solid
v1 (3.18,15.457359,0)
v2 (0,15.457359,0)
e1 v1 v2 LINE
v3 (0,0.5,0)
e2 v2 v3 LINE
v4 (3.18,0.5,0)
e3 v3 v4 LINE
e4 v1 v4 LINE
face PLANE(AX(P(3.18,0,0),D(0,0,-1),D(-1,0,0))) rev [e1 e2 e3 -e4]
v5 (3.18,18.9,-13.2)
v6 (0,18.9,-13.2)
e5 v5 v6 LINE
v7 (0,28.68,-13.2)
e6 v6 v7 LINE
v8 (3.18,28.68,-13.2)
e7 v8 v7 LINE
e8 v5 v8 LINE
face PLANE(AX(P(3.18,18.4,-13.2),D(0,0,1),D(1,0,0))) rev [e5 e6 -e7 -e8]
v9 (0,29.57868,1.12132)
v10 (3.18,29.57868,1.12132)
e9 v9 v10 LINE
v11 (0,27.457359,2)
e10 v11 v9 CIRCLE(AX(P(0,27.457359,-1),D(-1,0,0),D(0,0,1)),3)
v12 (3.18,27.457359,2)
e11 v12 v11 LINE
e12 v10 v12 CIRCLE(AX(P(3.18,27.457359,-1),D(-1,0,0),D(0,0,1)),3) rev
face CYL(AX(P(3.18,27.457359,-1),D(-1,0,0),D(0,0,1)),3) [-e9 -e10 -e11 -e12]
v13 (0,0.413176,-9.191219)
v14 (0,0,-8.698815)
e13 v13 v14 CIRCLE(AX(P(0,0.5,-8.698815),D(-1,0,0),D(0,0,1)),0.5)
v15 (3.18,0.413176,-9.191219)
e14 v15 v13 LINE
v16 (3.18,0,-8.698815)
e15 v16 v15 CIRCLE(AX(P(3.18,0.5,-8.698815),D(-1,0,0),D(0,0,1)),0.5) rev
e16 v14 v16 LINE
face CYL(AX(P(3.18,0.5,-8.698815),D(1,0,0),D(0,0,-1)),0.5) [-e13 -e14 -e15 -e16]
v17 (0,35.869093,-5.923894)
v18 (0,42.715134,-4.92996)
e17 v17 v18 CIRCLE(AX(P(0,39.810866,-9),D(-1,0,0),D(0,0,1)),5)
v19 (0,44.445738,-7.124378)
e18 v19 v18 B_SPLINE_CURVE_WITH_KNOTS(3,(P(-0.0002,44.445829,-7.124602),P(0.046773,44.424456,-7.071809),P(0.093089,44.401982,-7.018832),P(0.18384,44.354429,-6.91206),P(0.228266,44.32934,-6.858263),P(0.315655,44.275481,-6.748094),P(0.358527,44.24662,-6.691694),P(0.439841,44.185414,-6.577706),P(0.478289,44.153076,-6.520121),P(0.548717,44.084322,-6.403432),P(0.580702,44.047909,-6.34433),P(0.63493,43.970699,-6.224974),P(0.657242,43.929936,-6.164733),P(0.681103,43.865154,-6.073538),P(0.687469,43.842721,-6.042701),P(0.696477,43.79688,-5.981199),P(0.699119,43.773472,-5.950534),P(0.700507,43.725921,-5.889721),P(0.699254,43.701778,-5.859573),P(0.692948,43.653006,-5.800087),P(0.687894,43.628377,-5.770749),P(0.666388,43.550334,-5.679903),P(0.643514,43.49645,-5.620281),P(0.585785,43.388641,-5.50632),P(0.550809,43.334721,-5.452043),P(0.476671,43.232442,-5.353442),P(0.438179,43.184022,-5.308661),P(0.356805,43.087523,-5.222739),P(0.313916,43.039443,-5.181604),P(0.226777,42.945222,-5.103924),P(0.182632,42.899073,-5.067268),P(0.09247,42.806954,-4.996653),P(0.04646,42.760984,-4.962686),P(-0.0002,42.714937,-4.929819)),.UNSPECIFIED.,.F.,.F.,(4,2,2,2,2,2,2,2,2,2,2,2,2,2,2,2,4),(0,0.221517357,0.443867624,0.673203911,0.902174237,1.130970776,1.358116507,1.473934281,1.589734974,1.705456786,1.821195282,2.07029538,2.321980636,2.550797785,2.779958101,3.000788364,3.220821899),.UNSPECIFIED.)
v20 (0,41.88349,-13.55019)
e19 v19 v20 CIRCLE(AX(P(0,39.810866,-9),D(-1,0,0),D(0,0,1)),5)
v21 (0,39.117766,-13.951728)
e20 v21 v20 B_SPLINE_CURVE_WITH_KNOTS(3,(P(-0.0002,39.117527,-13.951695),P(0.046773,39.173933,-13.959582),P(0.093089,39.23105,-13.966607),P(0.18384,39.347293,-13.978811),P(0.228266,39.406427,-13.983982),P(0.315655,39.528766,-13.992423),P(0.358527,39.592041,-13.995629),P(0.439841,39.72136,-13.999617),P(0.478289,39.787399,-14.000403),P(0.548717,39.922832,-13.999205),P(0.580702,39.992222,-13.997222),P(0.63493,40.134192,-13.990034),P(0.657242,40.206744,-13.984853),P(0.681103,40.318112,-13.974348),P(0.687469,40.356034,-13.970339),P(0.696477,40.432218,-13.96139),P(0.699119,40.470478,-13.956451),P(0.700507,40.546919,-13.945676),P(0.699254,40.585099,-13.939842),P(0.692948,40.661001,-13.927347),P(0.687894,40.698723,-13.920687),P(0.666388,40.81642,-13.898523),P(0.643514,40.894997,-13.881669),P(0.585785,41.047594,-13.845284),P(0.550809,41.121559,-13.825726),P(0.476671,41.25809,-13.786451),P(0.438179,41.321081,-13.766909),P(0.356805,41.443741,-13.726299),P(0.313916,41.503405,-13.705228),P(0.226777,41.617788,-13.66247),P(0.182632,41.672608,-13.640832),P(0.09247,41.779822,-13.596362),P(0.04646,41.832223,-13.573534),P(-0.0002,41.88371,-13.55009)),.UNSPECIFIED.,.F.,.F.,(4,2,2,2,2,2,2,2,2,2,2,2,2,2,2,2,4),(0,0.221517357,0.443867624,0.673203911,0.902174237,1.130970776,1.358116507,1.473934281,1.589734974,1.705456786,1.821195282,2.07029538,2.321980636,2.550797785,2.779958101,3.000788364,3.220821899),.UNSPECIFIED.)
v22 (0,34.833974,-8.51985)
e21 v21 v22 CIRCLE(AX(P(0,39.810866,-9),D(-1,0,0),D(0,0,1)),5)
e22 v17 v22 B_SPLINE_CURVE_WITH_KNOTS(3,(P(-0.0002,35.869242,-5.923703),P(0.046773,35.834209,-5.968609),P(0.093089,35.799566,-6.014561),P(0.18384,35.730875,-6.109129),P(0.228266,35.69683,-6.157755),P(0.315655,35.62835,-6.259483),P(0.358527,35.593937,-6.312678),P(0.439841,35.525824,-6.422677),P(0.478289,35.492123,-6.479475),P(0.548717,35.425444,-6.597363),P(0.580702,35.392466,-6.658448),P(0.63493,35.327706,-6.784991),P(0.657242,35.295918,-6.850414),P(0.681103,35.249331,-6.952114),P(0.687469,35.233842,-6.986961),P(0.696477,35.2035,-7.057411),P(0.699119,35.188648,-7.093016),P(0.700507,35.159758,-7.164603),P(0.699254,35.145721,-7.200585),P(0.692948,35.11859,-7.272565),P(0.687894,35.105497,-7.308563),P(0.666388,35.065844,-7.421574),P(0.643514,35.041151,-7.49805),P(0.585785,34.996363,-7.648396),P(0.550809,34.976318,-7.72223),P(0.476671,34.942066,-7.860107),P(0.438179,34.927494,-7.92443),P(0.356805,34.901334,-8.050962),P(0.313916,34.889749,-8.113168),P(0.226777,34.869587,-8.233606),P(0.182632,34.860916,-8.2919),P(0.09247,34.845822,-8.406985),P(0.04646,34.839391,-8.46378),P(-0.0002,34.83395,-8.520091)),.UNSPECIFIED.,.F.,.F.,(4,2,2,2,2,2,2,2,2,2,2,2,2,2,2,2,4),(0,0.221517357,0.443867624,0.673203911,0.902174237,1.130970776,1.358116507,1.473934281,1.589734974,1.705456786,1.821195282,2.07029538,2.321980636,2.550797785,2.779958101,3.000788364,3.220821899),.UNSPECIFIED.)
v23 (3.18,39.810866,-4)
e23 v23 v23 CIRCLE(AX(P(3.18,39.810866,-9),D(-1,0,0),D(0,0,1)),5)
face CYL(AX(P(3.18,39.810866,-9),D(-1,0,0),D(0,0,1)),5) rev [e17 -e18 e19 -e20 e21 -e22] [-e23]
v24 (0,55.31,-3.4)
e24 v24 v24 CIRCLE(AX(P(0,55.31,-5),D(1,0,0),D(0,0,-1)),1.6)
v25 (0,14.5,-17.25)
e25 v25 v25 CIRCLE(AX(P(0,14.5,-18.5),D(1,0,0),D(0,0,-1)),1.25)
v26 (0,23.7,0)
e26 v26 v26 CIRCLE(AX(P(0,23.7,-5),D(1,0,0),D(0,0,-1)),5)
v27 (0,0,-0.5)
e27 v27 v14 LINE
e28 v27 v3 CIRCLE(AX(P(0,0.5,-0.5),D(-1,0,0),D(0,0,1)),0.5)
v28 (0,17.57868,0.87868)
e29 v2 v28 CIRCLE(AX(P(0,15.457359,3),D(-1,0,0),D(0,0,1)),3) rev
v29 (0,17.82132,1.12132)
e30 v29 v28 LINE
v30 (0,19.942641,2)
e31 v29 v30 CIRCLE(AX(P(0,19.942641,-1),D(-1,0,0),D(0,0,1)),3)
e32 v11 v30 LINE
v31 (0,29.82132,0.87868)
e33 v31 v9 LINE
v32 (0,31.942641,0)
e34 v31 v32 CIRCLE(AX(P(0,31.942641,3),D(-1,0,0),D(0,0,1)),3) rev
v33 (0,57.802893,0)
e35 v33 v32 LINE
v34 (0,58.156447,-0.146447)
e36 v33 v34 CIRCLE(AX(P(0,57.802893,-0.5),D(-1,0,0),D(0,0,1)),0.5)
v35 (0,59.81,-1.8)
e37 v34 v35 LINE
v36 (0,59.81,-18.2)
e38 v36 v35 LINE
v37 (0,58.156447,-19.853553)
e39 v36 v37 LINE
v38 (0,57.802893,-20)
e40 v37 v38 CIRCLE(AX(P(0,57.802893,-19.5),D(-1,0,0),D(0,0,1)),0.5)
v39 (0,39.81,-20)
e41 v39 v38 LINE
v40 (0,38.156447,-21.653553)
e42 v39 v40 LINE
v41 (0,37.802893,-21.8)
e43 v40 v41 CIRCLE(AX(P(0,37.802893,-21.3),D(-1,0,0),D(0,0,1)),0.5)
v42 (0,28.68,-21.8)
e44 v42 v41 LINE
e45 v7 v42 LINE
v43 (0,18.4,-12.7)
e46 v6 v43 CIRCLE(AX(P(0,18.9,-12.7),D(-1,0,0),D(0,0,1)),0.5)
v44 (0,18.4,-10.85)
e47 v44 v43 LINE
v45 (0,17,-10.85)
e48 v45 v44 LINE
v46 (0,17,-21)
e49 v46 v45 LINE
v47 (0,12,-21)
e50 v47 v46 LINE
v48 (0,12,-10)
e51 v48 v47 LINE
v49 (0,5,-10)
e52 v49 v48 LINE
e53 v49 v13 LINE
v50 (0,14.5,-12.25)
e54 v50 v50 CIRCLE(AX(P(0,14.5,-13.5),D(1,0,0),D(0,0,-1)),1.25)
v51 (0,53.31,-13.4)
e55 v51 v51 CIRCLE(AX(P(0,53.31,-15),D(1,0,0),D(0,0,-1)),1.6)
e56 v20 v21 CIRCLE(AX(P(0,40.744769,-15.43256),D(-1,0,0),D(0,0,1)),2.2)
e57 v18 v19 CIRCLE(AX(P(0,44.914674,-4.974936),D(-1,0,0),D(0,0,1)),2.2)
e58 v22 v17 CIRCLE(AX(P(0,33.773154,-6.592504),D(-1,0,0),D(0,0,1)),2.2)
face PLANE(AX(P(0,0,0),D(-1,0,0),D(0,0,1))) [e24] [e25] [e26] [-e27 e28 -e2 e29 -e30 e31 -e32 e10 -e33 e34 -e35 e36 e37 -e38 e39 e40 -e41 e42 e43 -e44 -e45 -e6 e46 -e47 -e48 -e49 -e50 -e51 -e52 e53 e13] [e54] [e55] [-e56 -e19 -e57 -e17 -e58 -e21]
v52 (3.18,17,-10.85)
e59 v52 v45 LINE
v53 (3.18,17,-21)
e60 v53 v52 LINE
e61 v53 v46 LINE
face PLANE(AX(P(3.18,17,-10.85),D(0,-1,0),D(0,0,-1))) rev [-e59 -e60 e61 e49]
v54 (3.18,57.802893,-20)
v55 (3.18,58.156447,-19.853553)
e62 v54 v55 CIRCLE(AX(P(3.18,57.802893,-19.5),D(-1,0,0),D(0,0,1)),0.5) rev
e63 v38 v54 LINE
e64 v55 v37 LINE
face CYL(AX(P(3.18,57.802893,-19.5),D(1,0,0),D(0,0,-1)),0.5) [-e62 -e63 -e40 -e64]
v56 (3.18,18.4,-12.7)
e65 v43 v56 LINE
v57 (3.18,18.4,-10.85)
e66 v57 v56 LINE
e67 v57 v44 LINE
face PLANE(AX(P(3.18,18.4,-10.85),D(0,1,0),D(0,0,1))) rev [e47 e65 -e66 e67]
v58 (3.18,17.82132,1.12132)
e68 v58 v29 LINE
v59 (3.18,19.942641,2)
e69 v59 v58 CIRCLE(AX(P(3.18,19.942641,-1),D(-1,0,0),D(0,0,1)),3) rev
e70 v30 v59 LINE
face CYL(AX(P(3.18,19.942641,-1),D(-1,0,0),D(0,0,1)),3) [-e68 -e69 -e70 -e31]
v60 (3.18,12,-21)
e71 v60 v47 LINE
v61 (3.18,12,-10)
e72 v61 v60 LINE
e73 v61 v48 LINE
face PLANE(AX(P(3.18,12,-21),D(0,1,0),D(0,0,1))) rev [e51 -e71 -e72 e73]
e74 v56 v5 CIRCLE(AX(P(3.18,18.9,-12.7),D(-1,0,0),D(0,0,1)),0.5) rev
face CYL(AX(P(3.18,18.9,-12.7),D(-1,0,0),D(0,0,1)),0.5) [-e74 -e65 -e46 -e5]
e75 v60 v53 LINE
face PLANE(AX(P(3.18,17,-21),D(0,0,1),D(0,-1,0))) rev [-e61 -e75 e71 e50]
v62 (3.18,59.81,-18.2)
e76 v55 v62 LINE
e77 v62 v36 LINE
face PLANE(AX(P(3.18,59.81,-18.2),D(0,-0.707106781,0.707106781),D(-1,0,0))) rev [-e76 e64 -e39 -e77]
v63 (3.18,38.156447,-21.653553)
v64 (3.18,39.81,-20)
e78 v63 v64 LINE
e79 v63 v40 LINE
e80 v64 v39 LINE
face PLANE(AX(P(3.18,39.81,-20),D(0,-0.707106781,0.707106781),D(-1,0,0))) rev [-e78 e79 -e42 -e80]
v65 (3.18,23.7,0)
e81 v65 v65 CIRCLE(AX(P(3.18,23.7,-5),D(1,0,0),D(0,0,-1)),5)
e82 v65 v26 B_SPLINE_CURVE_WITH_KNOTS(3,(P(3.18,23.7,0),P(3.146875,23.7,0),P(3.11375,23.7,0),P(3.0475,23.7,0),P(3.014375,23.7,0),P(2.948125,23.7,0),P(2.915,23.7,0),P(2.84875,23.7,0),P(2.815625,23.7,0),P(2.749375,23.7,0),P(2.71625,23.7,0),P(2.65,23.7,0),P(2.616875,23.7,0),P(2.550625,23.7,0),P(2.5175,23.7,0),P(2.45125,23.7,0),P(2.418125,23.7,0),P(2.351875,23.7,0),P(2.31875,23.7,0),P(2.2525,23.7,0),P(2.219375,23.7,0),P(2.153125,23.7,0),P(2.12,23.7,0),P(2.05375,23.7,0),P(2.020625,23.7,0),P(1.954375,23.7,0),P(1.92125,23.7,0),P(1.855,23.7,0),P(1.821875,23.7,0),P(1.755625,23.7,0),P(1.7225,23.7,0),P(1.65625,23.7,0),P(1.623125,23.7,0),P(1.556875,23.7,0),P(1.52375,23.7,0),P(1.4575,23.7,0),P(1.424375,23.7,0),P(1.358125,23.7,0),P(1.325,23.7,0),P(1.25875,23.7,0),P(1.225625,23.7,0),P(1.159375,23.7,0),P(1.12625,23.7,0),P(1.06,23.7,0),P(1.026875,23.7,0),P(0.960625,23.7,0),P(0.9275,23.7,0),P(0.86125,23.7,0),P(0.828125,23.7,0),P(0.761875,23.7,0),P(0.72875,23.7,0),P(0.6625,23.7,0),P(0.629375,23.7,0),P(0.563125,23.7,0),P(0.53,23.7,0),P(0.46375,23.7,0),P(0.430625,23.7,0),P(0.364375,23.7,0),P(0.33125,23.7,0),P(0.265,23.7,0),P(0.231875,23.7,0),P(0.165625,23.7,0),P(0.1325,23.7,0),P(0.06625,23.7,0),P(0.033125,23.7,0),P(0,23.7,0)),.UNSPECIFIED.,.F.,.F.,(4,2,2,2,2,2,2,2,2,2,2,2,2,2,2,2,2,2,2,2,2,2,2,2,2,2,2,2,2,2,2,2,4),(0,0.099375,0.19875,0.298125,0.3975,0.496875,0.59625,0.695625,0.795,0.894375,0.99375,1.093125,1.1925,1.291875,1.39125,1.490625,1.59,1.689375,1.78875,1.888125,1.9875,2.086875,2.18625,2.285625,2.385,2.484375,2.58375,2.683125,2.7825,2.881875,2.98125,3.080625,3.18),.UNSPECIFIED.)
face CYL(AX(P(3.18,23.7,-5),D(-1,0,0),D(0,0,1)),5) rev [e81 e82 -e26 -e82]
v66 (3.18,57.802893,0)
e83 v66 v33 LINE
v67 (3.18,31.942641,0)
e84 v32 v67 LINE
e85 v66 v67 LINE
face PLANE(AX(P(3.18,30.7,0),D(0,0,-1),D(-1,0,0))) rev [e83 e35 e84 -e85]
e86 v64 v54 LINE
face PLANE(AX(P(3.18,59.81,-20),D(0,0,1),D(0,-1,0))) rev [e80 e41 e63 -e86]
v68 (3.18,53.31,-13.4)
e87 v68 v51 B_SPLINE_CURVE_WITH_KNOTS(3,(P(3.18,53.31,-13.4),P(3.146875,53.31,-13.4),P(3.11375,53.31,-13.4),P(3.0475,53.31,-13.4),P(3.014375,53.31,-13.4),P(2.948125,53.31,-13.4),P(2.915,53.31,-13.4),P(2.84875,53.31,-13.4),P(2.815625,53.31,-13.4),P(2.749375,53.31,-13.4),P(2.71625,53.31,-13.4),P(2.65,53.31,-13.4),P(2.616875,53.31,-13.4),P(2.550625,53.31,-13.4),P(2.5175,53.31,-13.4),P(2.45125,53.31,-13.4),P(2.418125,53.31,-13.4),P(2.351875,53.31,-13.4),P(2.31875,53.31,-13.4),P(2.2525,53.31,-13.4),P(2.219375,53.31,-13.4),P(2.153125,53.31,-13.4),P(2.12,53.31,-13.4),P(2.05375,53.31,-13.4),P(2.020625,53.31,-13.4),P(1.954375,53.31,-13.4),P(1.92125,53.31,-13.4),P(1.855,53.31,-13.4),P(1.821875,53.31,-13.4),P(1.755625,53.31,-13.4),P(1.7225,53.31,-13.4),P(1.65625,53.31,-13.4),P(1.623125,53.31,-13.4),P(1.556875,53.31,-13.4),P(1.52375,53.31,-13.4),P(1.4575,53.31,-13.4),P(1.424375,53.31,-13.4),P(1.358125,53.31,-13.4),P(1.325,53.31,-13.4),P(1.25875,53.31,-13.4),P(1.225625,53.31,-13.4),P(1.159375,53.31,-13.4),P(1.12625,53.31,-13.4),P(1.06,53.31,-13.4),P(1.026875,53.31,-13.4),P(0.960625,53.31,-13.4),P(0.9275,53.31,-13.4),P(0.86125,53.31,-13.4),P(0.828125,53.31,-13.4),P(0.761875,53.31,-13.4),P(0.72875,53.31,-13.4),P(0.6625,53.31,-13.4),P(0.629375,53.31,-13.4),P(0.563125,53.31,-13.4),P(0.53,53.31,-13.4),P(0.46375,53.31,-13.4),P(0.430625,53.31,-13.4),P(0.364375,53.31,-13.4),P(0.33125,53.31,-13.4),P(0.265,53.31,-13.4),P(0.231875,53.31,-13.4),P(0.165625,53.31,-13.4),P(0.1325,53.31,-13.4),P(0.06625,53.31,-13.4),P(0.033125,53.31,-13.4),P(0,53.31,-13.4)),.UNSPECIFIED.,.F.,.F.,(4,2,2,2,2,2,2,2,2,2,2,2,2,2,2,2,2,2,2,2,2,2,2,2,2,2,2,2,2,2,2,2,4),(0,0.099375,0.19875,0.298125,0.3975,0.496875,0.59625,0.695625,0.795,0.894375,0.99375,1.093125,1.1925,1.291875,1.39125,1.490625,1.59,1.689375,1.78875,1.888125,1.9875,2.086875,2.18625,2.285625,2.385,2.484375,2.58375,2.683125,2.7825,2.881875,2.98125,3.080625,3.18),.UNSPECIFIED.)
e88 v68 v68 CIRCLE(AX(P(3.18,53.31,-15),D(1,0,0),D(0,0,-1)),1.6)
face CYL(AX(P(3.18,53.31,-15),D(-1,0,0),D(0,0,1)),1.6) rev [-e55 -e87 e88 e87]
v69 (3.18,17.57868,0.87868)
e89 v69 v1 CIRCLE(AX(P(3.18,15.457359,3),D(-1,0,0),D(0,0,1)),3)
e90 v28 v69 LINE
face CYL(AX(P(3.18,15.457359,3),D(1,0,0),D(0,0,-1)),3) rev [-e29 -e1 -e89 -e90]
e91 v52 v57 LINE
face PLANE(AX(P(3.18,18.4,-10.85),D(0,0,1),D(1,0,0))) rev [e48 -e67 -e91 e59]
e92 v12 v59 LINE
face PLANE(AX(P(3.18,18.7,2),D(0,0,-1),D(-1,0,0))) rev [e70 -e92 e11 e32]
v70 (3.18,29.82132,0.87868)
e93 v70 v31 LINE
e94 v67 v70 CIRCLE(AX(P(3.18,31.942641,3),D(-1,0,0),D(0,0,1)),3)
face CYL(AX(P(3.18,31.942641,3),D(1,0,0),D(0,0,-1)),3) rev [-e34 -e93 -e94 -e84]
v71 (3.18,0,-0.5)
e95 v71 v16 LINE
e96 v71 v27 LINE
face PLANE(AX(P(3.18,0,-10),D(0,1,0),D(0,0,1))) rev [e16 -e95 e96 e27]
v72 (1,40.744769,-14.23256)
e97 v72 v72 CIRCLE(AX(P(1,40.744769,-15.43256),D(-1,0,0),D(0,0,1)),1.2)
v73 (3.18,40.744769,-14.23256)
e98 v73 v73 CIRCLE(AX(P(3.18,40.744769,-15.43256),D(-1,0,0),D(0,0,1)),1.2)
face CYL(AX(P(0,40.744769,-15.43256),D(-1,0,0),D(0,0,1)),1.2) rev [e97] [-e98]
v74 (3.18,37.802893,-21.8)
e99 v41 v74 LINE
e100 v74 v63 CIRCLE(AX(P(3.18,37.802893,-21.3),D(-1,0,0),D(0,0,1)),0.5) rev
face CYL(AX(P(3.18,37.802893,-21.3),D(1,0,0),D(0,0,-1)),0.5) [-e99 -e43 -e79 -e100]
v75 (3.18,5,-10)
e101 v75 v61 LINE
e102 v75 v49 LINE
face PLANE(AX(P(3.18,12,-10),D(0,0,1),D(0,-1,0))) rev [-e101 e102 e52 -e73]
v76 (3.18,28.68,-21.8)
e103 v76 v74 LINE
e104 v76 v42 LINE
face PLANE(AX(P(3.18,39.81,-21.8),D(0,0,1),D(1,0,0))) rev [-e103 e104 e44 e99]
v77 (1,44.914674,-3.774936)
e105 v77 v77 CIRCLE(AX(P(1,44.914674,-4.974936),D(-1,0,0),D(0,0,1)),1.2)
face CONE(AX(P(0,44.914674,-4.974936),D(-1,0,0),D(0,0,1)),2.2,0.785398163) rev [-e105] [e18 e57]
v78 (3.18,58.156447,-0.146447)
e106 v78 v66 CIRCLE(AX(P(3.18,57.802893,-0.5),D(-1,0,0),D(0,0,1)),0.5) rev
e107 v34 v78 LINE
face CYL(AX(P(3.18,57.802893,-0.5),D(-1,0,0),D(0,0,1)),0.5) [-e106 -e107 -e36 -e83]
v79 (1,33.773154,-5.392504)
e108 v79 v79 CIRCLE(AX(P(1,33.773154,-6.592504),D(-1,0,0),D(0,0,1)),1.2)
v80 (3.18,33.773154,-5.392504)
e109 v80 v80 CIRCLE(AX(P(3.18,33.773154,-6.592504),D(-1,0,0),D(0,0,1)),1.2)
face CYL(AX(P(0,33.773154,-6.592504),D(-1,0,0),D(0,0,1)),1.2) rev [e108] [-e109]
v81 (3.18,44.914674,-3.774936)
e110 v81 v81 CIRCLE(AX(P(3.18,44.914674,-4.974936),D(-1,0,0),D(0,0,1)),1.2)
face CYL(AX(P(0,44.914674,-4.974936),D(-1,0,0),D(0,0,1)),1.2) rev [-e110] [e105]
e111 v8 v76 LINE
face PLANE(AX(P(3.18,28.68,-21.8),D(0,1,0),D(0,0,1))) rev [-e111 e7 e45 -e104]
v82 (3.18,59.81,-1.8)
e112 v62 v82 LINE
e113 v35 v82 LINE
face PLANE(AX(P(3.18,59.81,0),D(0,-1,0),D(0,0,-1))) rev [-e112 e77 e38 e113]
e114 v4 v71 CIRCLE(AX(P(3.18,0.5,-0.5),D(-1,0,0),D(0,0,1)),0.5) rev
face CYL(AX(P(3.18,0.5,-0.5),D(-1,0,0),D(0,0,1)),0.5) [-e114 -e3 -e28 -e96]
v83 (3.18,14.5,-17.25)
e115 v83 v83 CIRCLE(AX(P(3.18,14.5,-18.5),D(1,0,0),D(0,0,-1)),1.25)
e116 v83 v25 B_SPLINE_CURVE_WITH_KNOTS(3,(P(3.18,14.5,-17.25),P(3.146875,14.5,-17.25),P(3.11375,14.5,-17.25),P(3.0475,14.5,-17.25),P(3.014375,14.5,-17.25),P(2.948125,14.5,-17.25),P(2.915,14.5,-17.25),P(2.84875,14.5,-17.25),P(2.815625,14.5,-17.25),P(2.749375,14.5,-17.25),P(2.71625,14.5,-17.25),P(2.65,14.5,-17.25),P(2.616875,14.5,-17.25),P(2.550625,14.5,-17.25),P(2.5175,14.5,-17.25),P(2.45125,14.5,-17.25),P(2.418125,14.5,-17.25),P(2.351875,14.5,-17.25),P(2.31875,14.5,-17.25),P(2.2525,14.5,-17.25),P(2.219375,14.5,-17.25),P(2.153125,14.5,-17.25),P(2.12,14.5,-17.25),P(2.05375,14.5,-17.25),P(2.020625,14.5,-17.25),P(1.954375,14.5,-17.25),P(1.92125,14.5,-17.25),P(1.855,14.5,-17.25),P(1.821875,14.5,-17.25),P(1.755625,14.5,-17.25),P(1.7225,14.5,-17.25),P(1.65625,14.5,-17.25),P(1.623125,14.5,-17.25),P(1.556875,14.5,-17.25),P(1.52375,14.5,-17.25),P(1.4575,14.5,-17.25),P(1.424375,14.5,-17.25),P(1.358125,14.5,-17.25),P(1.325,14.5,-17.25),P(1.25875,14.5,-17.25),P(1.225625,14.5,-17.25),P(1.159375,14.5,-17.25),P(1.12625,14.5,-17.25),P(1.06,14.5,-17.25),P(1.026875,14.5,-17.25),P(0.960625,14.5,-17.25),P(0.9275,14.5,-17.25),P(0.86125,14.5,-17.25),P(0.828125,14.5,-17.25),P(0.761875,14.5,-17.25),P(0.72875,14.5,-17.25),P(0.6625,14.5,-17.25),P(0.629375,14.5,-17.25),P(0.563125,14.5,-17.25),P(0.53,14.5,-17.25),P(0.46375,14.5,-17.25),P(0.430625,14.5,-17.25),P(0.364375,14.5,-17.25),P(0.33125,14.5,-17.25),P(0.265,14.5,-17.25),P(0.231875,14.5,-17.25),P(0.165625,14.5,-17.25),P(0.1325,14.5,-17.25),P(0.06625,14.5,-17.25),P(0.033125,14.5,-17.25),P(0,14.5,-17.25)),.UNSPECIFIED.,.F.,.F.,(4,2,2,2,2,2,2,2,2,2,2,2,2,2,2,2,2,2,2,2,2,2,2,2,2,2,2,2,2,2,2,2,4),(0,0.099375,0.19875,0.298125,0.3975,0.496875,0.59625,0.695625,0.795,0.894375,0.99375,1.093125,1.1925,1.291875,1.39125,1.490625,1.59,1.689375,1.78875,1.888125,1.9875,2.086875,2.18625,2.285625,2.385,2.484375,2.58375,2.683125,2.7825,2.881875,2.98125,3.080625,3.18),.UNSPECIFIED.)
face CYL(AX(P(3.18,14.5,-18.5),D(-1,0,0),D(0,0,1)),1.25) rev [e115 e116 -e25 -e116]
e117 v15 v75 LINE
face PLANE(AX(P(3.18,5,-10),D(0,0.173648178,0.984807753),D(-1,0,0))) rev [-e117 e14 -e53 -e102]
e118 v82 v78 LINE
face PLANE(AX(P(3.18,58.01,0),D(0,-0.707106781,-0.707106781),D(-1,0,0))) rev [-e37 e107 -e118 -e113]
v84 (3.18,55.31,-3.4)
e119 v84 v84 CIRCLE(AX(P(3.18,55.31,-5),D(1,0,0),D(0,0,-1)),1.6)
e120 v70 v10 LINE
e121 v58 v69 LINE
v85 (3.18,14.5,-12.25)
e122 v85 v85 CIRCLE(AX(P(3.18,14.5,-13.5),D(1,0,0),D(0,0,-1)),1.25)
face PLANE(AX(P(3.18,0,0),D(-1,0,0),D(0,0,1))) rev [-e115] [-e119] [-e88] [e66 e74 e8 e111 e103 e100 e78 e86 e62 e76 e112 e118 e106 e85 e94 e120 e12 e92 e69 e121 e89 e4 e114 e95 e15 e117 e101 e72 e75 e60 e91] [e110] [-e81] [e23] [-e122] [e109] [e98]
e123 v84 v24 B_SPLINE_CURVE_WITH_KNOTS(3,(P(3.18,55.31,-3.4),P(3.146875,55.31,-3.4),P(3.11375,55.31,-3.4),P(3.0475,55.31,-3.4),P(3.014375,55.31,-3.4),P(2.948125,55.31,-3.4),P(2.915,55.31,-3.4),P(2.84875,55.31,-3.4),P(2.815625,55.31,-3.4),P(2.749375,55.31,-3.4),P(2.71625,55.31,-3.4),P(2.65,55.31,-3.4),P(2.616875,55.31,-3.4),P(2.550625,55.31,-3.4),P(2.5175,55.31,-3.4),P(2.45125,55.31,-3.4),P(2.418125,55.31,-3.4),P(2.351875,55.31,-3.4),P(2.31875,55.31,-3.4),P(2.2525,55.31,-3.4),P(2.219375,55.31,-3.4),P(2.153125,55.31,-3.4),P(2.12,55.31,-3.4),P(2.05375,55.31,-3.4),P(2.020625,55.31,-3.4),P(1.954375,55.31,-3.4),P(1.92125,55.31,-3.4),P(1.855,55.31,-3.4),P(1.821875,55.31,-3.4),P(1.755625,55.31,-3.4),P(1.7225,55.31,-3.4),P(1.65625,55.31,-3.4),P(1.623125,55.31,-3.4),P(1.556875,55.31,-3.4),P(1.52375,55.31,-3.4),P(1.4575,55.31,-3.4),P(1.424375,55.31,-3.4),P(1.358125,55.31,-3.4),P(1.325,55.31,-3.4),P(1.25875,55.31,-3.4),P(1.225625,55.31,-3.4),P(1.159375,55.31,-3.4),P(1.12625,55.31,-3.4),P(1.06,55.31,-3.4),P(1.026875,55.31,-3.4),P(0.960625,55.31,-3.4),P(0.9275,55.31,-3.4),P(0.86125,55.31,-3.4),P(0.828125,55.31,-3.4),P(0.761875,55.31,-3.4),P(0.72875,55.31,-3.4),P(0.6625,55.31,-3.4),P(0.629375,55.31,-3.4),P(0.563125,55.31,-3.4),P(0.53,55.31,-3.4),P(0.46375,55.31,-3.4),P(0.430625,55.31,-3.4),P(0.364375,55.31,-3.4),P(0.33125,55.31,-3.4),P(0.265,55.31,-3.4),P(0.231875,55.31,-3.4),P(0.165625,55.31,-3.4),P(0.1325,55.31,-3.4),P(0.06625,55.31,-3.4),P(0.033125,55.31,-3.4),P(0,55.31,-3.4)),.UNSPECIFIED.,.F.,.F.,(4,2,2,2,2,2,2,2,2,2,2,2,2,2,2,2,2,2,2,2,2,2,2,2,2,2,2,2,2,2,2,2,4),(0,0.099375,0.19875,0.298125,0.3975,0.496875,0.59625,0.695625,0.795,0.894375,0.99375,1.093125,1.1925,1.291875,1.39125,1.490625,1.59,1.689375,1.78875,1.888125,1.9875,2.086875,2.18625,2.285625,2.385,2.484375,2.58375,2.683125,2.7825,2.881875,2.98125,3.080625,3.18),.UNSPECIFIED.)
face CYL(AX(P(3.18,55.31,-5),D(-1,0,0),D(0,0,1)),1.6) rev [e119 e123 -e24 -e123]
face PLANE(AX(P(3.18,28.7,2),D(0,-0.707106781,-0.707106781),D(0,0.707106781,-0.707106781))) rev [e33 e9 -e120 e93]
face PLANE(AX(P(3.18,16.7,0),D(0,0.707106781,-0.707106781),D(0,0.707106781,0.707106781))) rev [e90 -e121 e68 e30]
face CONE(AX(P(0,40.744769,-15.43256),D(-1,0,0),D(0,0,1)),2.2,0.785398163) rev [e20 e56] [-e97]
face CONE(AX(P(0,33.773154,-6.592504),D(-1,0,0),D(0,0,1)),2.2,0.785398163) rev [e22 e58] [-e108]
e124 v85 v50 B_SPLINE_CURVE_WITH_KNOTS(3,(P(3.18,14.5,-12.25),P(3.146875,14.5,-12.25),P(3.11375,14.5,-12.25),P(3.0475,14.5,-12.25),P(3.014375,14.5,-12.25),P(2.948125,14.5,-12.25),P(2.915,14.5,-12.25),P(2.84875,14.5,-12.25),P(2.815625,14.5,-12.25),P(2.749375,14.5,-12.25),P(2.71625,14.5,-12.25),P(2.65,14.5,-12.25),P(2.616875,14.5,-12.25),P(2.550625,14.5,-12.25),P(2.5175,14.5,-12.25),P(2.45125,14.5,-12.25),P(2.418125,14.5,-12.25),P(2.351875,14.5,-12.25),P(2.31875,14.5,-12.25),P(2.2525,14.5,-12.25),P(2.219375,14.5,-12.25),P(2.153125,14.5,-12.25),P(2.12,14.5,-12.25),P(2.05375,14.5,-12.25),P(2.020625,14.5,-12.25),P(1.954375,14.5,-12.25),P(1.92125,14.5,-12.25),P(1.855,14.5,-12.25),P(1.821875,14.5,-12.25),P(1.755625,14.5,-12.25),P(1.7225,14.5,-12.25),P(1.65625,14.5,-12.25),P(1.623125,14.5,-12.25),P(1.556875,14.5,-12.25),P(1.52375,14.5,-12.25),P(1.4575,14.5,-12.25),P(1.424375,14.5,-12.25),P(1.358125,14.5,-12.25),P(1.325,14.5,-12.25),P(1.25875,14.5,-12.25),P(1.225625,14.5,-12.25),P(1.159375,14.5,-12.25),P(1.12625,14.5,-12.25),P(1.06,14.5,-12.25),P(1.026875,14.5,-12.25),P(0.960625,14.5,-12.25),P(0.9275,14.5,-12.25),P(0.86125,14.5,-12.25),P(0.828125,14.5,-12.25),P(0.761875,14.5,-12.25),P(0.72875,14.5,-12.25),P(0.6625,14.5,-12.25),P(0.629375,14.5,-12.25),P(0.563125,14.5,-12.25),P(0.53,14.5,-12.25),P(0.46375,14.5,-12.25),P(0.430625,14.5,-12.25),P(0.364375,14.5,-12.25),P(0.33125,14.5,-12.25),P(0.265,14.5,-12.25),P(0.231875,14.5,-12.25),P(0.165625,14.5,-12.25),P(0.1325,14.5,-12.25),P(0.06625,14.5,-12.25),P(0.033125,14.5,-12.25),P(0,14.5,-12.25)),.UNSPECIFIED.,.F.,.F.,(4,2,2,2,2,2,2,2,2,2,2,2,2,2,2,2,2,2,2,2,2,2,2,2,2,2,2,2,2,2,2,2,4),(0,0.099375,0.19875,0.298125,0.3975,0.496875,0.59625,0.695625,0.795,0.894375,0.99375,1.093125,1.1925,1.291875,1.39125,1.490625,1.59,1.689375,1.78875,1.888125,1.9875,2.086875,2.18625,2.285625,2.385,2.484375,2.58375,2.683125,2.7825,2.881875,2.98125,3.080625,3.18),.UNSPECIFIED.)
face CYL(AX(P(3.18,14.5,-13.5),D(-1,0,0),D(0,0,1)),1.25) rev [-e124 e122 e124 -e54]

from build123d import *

# Parameters (mm, degrees)
SKETCH1_R                                       = 5
SKETCH1_R_2                                     = 1.6
SKETCH1_R_3                                     = 1.25
BOSS_EXTRUDE1_DEPTH                             = 3.18
CHAMFER1_SIZE                                   = 5
CHAMFER1_SIZE2                                  = 0.881634904
CSK_FOR_M2_FLAT_HEAD_MACHINE_SCREW1_D           = 2.4
CSK_FOR_M2_FLAT_HEAD_MACHINE_SCREW1_DEPTH       = 3.508967257
CSK_FOR_M2_FLAT_HEAD_MACHINE_SCREW1_CSINK_D     = 4.4
CSK_FOR_M2_FLAT_HEAD_MACHINE_SCREW1_CSINK_ANGLE = 90
CSK_FOR_M2_FLAT_HEAD_MACHINE_SCREW1_TIP         = 0.721032743
SKETCH3_R                                       = 5
CUT_EXTRUDE4_DEPTH                              = 64.738438167
FILLET2_R                                       = 3
CHAMFER2_SIZE                                   = 1.8
FILLET4_R                                       = 0.5


with BuildPart() as part:
    # Sketch1 → Boss-Extrude1 (new body)
    with BuildSketch(Plane(origin=(0, 0, 0), x_dir=(0, 0, -1), z_dir=(1, 0, 0))):
        Polygon((0, 0), (0, 16.7), (-2, 18.7), (-2, 28.7), (0, 30.7), (0, 59.81), (20, 59.81), (20, 39.81), (21.8, 39.81), (21.8, 28.68), (13.2, 28.68), (13.2, 18.4), (10.85, 18.4), (10.85, 17), (21, 17), (21, 12), (10, 12), (10, 0), align=None)
        with Locations(Location((5, 23.7, 0), (0, 0, 180))):
            Circle(SKETCH1_R, mode=Mode.SUBTRACT)
        with Locations(Location((5, 55.31, 0), (0, 0, 180))):
            Circle(SKETCH1_R_2, mode=Mode.SUBTRACT)
        with Locations(Location((15, 53.31, 0), (0, 0, 180))):
            Circle(SKETCH1_R_2, mode=Mode.SUBTRACT)
        with Locations(Location((18.5, 14.5, 0), (0, 0, 180))):
            Circle(SKETCH1_R_3, mode=Mode.SUBTRACT)
        with Locations(Location((13.5, 14.5, 0), (0, 0, 180))):
            Circle(SKETCH1_R_3, mode=Mode.SUBTRACT)
    extrude(amount=BOSS_EXTRUDE1_DEPTH)

    # Chamfer1
    chamfer1_edges = [part.edges().sort_by_distance(p)[0] for p in [
        (1.59, 0, -10),
    ]]
    chamfer1_side = [part.faces().sort_by_distance(p)[0] for p in [
        (1.59, 6, -10),
    ]]
    chamfer(chamfer1_edges, length=CHAMFER1_SIZE, length2=CHAMFER1_SIZE2, reference=chamfer1_side[0])

    # CSK for M2 Flat Head Machine Screw1
    with Locations(Plane.ZY):
        with Locations((-4.974936087, 44.914674329), (-15.432559713, 40.744769284), (-6.592504199, 33.773154083)):
            CounterSinkHole(CSK_FOR_M2_FLAT_HEAD_MACHINE_SCREW1_D / 2, CSK_FOR_M2_FLAT_HEAD_MACHINE_SCREW1_CSINK_D / 2, depth=CSK_FOR_M2_FLAT_HEAD_MACHINE_SCREW1_DEPTH, counter_sink_angle=CSK_FOR_M2_FLAT_HEAD_MACHINE_SCREW1_CSINK_ANGLE)
            with Locations((0, 0, -(CSK_FOR_M2_FLAT_HEAD_MACHINE_SCREW1_DEPTH + CSK_FOR_M2_FLAT_HEAD_MACHINE_SCREW1_TIP / 2))):  # 118° drill point
                Cone(0, CSK_FOR_M2_FLAT_HEAD_MACHINE_SCREW1_D / 2, CSK_FOR_M2_FLAT_HEAD_MACHINE_SCREW1_TIP, mode=Mode.SUBTRACT)

    # Sketch3 → Cut-Extrude4 (cut, through all)
    with BuildSketch(Plane.ZY):
        with Locations((-9, 39.810865899)):
            Circle(SKETCH3_R)
    extrude(amount=-CUT_EXTRUDE4_DEPTH, mode=Mode.SUBTRACT)

    # Fillet2
    fillet2_edges = [part.edges().sort_by_distance(p)[0] for p in [
        (1.59, 16.7, 0),
        (1.59, 18.7, 2),
        (1.59, 28.7, 2),
        (1.59, 30.7, 0),
    ]]
    fillet(fillet2_edges, radius=FILLET2_R)

    # Chamfer2
    chamfer2_edges = [part.edges().sort_by_distance(p)[0] for p in [
        (1.59, 59.81, -20),
        (1.59, 59.81, 0),
        (1.59, 39.81, -21.8),
    ]]
    chamfer(chamfer2_edges, length=CHAMFER2_SIZE - 0.0001)  # a hair under: the kernel refuses the full size

    # Fillet4
    fillet4_edges = [part.edges().sort_by_distance(p)[0] for p in [
        (1.59, 38.0101, -21.8),
        (1.59, 58.0101, -20),
        (1.59, 58.0101, 0),
        (1.59, 0, 0),
        (1.59, 18.4, -13.2),
        (1.59, 0, -9.118365096),
    ]]
    fillet(fillet4_edges, radius=FILLET4_R)


solid = part.part
